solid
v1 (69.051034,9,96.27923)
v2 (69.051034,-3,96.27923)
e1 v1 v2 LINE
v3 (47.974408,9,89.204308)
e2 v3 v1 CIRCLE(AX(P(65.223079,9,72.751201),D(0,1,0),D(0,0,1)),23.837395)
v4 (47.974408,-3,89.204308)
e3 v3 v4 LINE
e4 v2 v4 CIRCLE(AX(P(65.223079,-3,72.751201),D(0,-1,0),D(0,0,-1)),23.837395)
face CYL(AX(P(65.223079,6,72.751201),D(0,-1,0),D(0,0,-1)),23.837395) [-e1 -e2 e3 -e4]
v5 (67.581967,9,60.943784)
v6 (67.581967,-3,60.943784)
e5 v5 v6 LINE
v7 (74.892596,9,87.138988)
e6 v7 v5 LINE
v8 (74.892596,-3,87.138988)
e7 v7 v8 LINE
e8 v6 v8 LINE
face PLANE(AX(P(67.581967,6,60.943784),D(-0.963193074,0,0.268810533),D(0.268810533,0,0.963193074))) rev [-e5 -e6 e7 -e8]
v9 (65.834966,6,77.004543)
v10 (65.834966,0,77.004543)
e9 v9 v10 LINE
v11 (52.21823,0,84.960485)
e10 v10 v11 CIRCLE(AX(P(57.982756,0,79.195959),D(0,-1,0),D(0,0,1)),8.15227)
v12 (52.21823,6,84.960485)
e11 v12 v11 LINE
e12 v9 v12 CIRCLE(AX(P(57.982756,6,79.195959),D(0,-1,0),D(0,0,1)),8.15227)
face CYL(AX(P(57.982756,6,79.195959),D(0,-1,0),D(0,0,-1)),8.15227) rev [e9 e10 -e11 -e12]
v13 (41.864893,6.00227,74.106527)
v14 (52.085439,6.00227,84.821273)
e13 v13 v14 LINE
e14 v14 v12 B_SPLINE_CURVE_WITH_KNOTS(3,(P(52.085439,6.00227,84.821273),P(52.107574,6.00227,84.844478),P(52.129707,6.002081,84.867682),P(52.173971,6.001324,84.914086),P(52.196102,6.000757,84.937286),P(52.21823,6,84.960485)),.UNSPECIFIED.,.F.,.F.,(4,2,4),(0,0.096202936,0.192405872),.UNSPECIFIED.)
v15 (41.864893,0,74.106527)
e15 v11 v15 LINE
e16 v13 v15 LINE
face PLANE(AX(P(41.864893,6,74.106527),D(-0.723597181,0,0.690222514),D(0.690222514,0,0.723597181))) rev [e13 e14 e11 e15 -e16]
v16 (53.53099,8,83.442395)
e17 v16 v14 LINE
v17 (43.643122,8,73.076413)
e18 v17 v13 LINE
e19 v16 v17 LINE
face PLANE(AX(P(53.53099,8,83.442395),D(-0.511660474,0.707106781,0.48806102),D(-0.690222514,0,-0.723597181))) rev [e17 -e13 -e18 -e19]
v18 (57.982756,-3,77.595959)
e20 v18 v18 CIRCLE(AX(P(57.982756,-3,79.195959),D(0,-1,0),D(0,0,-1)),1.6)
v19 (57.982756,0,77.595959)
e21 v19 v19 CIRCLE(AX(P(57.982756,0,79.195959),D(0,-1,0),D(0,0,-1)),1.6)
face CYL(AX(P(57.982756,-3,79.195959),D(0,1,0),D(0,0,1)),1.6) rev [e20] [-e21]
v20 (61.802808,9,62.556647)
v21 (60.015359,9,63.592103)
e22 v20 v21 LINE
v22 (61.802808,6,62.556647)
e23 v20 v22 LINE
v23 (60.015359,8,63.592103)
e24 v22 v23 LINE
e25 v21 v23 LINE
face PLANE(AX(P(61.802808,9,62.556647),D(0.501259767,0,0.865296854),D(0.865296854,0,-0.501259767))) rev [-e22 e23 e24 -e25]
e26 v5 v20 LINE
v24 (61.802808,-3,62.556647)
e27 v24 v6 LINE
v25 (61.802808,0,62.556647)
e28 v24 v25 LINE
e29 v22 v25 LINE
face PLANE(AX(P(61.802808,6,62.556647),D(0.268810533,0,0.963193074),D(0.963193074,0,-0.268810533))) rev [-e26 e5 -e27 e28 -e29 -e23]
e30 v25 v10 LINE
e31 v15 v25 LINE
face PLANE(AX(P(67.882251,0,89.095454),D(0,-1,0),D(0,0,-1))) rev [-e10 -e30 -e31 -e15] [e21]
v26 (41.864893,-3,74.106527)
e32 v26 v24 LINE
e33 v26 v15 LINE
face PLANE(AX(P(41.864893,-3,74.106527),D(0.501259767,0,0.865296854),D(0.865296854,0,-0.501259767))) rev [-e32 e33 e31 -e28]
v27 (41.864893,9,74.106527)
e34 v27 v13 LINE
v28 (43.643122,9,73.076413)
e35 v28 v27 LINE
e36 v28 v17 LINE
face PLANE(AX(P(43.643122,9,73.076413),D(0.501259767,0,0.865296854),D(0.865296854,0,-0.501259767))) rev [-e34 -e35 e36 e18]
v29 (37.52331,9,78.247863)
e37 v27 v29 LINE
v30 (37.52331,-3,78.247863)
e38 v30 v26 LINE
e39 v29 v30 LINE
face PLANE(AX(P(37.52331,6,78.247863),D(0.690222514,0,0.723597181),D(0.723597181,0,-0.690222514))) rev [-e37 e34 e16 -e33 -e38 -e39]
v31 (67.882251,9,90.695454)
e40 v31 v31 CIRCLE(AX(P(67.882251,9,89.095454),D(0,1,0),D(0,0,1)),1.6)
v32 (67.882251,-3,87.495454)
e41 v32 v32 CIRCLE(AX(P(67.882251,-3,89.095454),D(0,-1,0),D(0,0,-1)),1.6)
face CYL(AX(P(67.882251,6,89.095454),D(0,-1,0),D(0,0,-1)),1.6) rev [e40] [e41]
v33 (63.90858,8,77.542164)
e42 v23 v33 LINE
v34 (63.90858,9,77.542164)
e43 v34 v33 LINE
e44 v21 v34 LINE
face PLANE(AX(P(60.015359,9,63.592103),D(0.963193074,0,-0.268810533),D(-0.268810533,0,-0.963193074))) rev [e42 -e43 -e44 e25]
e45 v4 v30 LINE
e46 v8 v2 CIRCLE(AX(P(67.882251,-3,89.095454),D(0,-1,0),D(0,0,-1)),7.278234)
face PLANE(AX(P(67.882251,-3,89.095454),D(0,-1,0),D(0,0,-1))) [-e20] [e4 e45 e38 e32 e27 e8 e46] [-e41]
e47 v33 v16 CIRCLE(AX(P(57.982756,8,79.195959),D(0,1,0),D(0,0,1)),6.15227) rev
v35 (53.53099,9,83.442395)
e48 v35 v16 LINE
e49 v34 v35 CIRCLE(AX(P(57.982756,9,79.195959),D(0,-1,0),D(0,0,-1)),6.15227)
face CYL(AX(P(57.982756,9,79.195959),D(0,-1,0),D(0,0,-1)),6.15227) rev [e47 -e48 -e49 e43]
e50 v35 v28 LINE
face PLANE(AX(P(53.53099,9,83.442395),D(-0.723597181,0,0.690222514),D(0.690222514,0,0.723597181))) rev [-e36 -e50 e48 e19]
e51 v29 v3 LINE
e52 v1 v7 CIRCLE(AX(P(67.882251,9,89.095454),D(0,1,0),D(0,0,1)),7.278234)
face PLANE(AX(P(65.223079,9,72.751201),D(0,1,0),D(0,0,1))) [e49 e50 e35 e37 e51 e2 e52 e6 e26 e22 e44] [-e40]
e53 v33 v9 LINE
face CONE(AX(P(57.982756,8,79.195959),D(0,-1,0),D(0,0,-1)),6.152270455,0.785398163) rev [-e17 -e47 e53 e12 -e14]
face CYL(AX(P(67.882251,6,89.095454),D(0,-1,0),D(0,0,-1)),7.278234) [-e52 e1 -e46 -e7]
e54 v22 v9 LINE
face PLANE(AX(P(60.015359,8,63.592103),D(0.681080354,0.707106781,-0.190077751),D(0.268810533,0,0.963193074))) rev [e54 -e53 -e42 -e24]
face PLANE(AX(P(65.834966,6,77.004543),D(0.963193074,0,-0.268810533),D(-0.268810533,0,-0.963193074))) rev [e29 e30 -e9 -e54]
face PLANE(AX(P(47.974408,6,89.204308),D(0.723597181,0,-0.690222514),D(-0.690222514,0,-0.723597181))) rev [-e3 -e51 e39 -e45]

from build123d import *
from build123d.topology import SkipClean

# Parameters (mm, degrees)
SKETCH1_R           = 1.6
BOSS_EXTRUDE1_DEPTH = 6
BOSS_EXTRUDE3_START = 3
SKETCH7_R           = 1.6
BOSS_EXTRUDE3_DEPTH = 3
SKETCH8_R           = 1.6
BOSS_EXTRUDE4_DEPTH = 3
CHAMFER1_SIZE       = 2


with BuildPart() as part:
    # Sketch1 → Boss-Extrude1 (new body)
    with BuildSketch(Plane(origin=(0, 0, 0), x_dir=(1, 0, 0), z_dir=(0, 1, 0))):
        with BuildLine():
            Line((41.864892623, -74.106527494), (52.218230336, -84.960485214))
            ThreePointArc((52.218230336, -84.960485214), (62.095402371, -86.234826865), (65.834966495, -77.004543326))
            Line((65.834966495, -77.004543326), (61.8028085, -62.55664722))
            Line((61.8028085, -62.55664722), (67.581966942, -60.943784022))
            Line((67.581966942, -60.943784022), (74.892595581, -87.138988466))
            ThreePointArc((74.892595581, -87.138988466), (74.014994187, -93.014912457), (69.051034467, -96.279230281))
            ThreePointArc((69.051034467, -96.279230281), (57.637399431, -95.34940583), (47.97440772, -89.204307831))
            Line((47.97440772, -89.204307831), (37.523309535, -78.247862579))
            Line((37.523309535, -78.247862579), (41.864892623, -74.106527494))
        make_face()
        with Locations(Location((67.882250994, -89.09545443, 0), (0, 0, 270))):
            Circle(SKETCH1_R, mode=Mode.SUBTRACT)
    extrude(amount=BOSS_EXTRUDE1_DEPTH)

    # Sketch7 → Boss-Extrude3 (add)
    with SkipClean():  # the faces are left unmerged after this step: merging them gives an invalid solid
        with BuildSketch(Plane.XZ.offset(BOSS_EXTRUDE3_START)):
            with BuildLine():
                Line((37.523309535, 78.247862579), (41.864892623, 74.106527494))
                Line((41.864892623, 74.106527494), (61.8028085, 62.55664722))
                Line((61.8028085, 62.55664722), (67.581966942, 60.943784022))
                Line((67.581966942, 60.943784022), (74.892595581, 87.138988466))
                ThreePointArc((74.892595581, 87.138988466), (74.014994187, 93.014912457), (69.051034467, 96.279230281))
                ThreePointArc((69.051034467, 96.279230281), (57.637399431, 95.34940583), (47.97440772, 89.204307831))
                Line((47.97440772, 89.204307831), (37.523309535, 78.247862579))
            make_face()
            with Locations(Location((67.882250994, 89.09545443, 0), (0, 0, 270))):
                Circle(SKETCH7_R, mode=Mode.SUBTRACT)
            with Locations(Location((57.982756057, 79.195959493, 0), (0, 0, 270))):
                Circle(SKETCH7_R, mode=Mode.SUBTRACT)
        extrude(amount=-BOSS_EXTRUDE3_DEPTH)

    # Sketch8 → Boss-Extrude4 (add)
    with BuildSketch(Plane(origin=(0, 6, 0), x_dir=(1, 0, 0), z_dir=(0, 1, 0))):
        with BuildLine():
            Line((41.864892623, -74.106527494), (37.523309535, -78.247862579))
            Line((37.523309535, -78.247862579), (47.97440772, -89.204307831))
            ThreePointArc((47.97440772, -89.204307831), (57.637399431, -95.34940583), (69.051034467, -96.279230281))
            ThreePointArc((69.051034467, -96.279230281), (74.014994187, -93.014912457), (74.892595581, -87.138988466))
            Line((74.892595581, -87.138988466), (67.581966942, -60.943784022))
            Line((67.581966942, -60.943784022), (61.8028085, -62.55664722))
            Line((61.8028085, -62.55664722), (60.015359325, -63.592102685))
            Line((60.015359325, -63.592102685), (63.908580348, -77.542164392))
            ThreePointArc((63.908580348, -77.542164392), (61.023544246, -84.544233882), (53.530990497, -83.442395075))
            Line((53.530990497, -83.442395075), (43.643121603, -73.076413215))
            Line((43.643121603, -73.076413215), (41.864892623, -74.106527494))
        make_face()
        with Locations(Location((67.882250994, -89.09545443, 0), (0, 0, 90))):
            Circle(SKETCH8_R, mode=Mode.SUBTRACT)
    extrude(amount=BOSS_EXTRUDE4_DEPTH)

    # Chamfer1
    # the kernel refuses this chamfer: 2 mm, written as the material it takes off along each edge
    with BuildSketch(Plane(origin=(53.530990497, 6, 83.442395075), x_dir=(-0.7233236015009538, -0.02749587661058648, 0.689961552755735), z_dir=(-0.6902225142158023, 0, -0.7235971813582588))) as chamfer1_piece_1_section:
        Polygon((CHAMFER1_SIZE * 0.999621916911, CHAMFER1_SIZE * 0.0274958766106), (-CHAMFER1_SIZE * 0.0274958766106, CHAMFER1_SIZE * 0.999621916911), (0, 0), align=None)
    chamfer1_piece_1 = extrude(amount=19.468990959, mode=Mode.PRIVATE)
    chamfer1_piece_1 = split(chamfer1_piece_1, bisect_by=Plane(origin=(47.085687298, 6.664817027, 79.579765809), z_dir=(0.7235971813582587, 0, -0.6902225142158024)), keep=Keep.TOP, mode=Mode.PRIVATE)
    add(chamfer1_piece_1, mode=Mode.SUBTRACT)
    with BuildSketch(Plane(origin=(57.982756057, 6, 79.195959493), x_dir=(0.9631930737538318, 0, -0.26881053303887753), z_dir=(-0.26881053303887753, 0, -0.9631930737538318))) as chamfer1_piece_2_section:
        Polygon((6.152270455 + CHAMFER1_SIZE, 0), (6.152270455, -CHAMFER1_SIZE), (6.152270455, 0), align=None)
    chamfer1_piece_2 = revolve(axis=Axis((57.982756057, 6, 79.195959493), (0, -1, 0)), revolution_arc=151.945773521, mode=Mode.PRIVATE)
    chamfer1_piece_2 = split(chamfer1_piece_2, bisect_by=Plane(origin=(55.289387778, 6.562492794, 88.180143835), z_dir=(0.7235971813582587, 0, -0.6902225142158024)), keep=Keep.TOP, mode=Mode.PRIVATE)
    add(chamfer1_piece_2, mode=Mode.SUBTRACT)
    with BuildSketch(Plane(origin=(58.632768376, 6, 58.638048201), x_dir=(0.9628289067414894, -0.027495876610586514, -0.26870890032227024), z_dir=(0.2688105330388776, 0, 0.9631930737538319))) as chamfer1_piece_3:
        Polygon((CHAMFER1_SIZE * 0.999621916911, CHAMFER1_SIZE * 0.0274958766106), (-CHAMFER1_SIZE * 0.0274958766106, CHAMFER1_SIZE * 0.999621916911), (0, 0), align=None)
    extrude(amount=19.626507609, mode=Mode.SUBTRACT)


solid = part.part
